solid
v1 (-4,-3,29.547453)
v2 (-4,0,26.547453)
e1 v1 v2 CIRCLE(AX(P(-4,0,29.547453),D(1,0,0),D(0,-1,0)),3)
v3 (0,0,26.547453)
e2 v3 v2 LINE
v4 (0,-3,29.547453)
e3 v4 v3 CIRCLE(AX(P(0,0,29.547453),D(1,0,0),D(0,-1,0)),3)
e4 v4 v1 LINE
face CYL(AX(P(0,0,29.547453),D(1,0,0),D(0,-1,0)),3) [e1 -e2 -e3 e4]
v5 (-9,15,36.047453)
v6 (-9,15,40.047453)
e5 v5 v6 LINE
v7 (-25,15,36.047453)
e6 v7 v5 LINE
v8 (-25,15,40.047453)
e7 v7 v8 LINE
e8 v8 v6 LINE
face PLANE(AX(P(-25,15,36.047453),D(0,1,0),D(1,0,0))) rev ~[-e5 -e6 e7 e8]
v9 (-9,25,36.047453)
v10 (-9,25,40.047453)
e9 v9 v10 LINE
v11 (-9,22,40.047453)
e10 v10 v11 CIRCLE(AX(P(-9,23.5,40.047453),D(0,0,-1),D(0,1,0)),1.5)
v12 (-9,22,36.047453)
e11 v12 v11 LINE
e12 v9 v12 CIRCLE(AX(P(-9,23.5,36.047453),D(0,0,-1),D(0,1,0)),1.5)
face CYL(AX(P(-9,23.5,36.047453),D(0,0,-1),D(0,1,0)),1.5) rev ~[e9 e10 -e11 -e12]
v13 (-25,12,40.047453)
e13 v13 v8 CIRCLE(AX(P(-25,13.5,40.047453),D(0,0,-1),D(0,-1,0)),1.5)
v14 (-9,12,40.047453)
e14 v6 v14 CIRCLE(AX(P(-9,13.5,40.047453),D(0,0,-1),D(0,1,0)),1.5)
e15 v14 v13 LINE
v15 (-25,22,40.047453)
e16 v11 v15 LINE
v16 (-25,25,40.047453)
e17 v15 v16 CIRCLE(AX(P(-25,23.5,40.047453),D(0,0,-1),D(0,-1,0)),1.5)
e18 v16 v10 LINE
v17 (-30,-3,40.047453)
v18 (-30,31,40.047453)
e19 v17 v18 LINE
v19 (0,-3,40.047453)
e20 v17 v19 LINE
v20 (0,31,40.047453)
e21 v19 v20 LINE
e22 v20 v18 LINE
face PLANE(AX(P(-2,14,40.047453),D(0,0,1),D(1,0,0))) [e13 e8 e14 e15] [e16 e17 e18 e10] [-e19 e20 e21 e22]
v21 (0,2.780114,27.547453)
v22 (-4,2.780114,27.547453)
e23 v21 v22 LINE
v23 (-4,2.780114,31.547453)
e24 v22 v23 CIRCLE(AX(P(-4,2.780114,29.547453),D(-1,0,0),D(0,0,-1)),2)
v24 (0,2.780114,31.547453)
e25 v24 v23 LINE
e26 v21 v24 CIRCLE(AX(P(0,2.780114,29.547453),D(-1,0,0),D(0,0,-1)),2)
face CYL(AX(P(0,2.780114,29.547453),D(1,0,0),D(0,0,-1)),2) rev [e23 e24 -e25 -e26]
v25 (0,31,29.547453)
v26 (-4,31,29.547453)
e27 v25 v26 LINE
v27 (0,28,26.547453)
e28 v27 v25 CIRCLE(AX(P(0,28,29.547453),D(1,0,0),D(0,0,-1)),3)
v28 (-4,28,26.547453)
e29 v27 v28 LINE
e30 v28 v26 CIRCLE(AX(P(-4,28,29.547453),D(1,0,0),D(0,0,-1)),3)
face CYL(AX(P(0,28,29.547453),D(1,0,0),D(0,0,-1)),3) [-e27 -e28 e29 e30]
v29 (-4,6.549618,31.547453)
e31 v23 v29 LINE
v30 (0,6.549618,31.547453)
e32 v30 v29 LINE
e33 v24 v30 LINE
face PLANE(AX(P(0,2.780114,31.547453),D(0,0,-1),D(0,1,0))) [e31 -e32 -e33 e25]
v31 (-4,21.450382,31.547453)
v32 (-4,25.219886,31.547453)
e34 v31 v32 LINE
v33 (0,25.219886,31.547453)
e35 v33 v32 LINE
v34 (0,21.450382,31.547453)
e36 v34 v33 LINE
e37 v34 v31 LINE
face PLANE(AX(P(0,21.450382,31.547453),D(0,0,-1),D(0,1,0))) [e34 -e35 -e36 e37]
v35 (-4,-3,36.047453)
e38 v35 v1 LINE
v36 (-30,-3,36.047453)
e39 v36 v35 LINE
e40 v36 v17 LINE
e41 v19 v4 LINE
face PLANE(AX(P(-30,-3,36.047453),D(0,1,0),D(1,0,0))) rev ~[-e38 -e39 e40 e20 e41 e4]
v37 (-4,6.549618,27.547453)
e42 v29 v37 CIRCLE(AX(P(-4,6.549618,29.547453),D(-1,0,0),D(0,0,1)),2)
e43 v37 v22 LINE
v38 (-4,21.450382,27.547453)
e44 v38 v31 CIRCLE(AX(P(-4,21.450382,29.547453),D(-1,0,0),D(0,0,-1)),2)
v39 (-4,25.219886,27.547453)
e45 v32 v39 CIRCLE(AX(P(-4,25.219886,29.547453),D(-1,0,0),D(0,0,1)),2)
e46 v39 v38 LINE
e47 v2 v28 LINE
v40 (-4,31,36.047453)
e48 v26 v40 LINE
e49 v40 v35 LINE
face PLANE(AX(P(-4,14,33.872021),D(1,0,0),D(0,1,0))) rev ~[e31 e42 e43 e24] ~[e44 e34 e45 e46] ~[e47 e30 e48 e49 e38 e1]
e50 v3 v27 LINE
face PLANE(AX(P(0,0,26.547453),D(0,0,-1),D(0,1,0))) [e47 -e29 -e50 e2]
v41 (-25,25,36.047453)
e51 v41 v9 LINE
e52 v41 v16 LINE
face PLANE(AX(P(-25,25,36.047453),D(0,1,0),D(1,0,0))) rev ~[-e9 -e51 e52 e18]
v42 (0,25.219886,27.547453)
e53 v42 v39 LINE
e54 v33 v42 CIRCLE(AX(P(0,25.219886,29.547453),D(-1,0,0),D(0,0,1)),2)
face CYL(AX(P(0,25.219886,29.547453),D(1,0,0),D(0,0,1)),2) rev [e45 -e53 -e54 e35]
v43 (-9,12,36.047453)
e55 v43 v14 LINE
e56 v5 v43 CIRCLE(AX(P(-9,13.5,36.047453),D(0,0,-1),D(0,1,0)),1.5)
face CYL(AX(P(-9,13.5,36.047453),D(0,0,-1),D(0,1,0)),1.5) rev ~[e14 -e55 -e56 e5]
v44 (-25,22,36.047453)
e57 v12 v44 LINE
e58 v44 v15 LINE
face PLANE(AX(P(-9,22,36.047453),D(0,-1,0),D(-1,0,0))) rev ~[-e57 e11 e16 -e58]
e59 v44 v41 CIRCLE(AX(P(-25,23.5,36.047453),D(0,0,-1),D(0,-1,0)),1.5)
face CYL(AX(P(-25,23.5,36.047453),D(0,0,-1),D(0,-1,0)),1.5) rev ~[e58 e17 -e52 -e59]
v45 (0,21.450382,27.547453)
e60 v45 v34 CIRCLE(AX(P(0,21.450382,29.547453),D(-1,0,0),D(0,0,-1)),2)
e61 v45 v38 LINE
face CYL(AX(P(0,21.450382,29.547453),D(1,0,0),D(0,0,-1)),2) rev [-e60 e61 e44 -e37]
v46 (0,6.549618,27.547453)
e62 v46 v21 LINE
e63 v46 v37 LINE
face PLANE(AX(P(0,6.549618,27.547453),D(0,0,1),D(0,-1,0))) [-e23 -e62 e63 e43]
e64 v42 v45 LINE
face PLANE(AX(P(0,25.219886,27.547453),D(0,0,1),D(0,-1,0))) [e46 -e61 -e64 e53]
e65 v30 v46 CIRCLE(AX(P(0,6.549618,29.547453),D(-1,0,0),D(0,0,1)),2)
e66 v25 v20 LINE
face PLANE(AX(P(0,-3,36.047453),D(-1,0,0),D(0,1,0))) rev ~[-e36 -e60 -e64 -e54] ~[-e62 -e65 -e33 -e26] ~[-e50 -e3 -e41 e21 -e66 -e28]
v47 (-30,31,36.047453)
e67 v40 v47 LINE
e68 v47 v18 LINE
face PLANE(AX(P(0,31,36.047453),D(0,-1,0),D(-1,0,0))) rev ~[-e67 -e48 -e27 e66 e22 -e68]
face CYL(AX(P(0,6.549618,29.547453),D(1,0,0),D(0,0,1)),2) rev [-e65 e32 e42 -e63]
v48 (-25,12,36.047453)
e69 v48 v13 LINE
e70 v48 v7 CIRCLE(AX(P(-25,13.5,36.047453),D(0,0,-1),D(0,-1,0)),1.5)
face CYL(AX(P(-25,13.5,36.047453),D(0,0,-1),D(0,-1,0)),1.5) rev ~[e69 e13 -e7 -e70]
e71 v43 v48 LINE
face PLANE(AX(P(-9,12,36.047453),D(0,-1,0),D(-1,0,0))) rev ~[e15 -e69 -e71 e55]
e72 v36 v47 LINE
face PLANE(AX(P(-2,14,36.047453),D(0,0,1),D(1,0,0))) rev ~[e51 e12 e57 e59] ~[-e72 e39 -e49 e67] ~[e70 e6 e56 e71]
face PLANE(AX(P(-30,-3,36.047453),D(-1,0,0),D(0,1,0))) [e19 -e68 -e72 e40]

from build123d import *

# Parameters (mm, degrees)
F1_DEPTH = 4
F2_W     = 4
F2_H     = 34
F2_W_2   = 26
F3_DEPTH = 4


# Not quite as in the source:
# - a feature names something its author has since deleted; it is built from what else it names


with BuildPart() as f1:
    # F0 (on Right) → F1 (new body)
    with BuildSketch(Plane.YZ):
        with BuildLine():
            ThreePointArc((-3, 29.5474529266), (-2.1213203436, 31.6687732702), (0, 32.5474529266))
            Line((0, 32.5474529266), (28, 32.5474529266))
            ThreePointArc((28, 32.5474529266), (30.1213203436, 31.6687732702), (31, 29.5474529266))
            Line((31, 29.5474529266), (31, 36.0474529266))
            Line((31, 36.0474529266), (-3, 36.0474529266))
            Line((-3, 36.0474529266), (-3, 29.5474529266))
        make_face()
        with BuildLine():
            Line((28, 32.5474529266), (0, 32.5474529266))
            ThreePointArc((0, 32.5474529266), (-2.1213203436, 31.6687732702), (-3, 29.5474529266))
            ThreePointArc((-3, 29.5474529266), (-2.1213203436, 27.4261325831), (0, 26.5474529266))
            Line((0, 26.5474529266), (28, 26.5474529266))
            ThreePointArc((28, 26.5474529266), (30.1213203436, 27.4261325831), (31, 29.5474529266))
            ThreePointArc((31, 29.5474529266), (30.1213203436, 31.6687732702), (28, 32.5474529266))
        make_face()
        with BuildLine():
            ThreePointArc((2.7801140677, 27.5474529266), (0.7801140677, 29.5474529266), (2.7801140677, 31.5474529266))
            Line((2.7801140677, 31.5474529266), (6.5496175084, 31.5474529266))
            ThreePointArc((6.5496175084, 31.5474529266), (8.5496175084, 29.5474529266), (6.5496175084, 27.5474529266))
            Line((6.5496175084, 27.5474529266), (2.7801140677, 27.5474529266))
        make_face(mode=Mode.SUBTRACT)
        with BuildLine():
            Line((21.4503824916, 31.5474529266), (25.2198859323, 31.5474529266))
            ThreePointArc((25.2198859323, 31.5474529266), (27.2198859323, 29.5474529266), (25.2198859323, 27.5474529266))
            Line((25.2198859323, 27.5474529266), (21.4503824916, 27.5474529266))
            ThreePointArc((21.4503824916, 27.5474529266), (19.4503824916, 29.5474529266), (21.4503824916, 31.5474529266))
        make_face(mode=Mode.SUBTRACT)
    extrude(amount=-F1_DEPTH)

    # F2 (on face) → F3 (join)
    with BuildSketch(Plane.XY.offset(36.0474529266)):
        with Locations((-2, 14)):
            Rectangle(F2_W, F2_H)
        with Locations((-17, 14)):
            Rectangle(F2_W_2, F2_H)
        with BuildLine():
            ThreePointArc((-9, 15), (-7.5, 13.5), (-9, 12))
            Line((-9, 12), (-25, 12))
            ThreePointArc((-25, 12), (-26.5, 13.5), (-25, 15))
            Line((-25, 15), (-9, 15))
        make_face(mode=Mode.SUBTRACT)
        with BuildLine():
            ThreePointArc((-9, 25), (-7.5, 23.5), (-9, 22))
            Line((-9, 22), (-25, 22))
            ThreePointArc((-25, 22), (-26.5, 23.5), (-25, 25))
            Line((-25, 25), (-9, 25))
        make_face(mode=Mode.SUBTRACT)
    extrude(amount=F3_DEPTH)


solid = f1.part
